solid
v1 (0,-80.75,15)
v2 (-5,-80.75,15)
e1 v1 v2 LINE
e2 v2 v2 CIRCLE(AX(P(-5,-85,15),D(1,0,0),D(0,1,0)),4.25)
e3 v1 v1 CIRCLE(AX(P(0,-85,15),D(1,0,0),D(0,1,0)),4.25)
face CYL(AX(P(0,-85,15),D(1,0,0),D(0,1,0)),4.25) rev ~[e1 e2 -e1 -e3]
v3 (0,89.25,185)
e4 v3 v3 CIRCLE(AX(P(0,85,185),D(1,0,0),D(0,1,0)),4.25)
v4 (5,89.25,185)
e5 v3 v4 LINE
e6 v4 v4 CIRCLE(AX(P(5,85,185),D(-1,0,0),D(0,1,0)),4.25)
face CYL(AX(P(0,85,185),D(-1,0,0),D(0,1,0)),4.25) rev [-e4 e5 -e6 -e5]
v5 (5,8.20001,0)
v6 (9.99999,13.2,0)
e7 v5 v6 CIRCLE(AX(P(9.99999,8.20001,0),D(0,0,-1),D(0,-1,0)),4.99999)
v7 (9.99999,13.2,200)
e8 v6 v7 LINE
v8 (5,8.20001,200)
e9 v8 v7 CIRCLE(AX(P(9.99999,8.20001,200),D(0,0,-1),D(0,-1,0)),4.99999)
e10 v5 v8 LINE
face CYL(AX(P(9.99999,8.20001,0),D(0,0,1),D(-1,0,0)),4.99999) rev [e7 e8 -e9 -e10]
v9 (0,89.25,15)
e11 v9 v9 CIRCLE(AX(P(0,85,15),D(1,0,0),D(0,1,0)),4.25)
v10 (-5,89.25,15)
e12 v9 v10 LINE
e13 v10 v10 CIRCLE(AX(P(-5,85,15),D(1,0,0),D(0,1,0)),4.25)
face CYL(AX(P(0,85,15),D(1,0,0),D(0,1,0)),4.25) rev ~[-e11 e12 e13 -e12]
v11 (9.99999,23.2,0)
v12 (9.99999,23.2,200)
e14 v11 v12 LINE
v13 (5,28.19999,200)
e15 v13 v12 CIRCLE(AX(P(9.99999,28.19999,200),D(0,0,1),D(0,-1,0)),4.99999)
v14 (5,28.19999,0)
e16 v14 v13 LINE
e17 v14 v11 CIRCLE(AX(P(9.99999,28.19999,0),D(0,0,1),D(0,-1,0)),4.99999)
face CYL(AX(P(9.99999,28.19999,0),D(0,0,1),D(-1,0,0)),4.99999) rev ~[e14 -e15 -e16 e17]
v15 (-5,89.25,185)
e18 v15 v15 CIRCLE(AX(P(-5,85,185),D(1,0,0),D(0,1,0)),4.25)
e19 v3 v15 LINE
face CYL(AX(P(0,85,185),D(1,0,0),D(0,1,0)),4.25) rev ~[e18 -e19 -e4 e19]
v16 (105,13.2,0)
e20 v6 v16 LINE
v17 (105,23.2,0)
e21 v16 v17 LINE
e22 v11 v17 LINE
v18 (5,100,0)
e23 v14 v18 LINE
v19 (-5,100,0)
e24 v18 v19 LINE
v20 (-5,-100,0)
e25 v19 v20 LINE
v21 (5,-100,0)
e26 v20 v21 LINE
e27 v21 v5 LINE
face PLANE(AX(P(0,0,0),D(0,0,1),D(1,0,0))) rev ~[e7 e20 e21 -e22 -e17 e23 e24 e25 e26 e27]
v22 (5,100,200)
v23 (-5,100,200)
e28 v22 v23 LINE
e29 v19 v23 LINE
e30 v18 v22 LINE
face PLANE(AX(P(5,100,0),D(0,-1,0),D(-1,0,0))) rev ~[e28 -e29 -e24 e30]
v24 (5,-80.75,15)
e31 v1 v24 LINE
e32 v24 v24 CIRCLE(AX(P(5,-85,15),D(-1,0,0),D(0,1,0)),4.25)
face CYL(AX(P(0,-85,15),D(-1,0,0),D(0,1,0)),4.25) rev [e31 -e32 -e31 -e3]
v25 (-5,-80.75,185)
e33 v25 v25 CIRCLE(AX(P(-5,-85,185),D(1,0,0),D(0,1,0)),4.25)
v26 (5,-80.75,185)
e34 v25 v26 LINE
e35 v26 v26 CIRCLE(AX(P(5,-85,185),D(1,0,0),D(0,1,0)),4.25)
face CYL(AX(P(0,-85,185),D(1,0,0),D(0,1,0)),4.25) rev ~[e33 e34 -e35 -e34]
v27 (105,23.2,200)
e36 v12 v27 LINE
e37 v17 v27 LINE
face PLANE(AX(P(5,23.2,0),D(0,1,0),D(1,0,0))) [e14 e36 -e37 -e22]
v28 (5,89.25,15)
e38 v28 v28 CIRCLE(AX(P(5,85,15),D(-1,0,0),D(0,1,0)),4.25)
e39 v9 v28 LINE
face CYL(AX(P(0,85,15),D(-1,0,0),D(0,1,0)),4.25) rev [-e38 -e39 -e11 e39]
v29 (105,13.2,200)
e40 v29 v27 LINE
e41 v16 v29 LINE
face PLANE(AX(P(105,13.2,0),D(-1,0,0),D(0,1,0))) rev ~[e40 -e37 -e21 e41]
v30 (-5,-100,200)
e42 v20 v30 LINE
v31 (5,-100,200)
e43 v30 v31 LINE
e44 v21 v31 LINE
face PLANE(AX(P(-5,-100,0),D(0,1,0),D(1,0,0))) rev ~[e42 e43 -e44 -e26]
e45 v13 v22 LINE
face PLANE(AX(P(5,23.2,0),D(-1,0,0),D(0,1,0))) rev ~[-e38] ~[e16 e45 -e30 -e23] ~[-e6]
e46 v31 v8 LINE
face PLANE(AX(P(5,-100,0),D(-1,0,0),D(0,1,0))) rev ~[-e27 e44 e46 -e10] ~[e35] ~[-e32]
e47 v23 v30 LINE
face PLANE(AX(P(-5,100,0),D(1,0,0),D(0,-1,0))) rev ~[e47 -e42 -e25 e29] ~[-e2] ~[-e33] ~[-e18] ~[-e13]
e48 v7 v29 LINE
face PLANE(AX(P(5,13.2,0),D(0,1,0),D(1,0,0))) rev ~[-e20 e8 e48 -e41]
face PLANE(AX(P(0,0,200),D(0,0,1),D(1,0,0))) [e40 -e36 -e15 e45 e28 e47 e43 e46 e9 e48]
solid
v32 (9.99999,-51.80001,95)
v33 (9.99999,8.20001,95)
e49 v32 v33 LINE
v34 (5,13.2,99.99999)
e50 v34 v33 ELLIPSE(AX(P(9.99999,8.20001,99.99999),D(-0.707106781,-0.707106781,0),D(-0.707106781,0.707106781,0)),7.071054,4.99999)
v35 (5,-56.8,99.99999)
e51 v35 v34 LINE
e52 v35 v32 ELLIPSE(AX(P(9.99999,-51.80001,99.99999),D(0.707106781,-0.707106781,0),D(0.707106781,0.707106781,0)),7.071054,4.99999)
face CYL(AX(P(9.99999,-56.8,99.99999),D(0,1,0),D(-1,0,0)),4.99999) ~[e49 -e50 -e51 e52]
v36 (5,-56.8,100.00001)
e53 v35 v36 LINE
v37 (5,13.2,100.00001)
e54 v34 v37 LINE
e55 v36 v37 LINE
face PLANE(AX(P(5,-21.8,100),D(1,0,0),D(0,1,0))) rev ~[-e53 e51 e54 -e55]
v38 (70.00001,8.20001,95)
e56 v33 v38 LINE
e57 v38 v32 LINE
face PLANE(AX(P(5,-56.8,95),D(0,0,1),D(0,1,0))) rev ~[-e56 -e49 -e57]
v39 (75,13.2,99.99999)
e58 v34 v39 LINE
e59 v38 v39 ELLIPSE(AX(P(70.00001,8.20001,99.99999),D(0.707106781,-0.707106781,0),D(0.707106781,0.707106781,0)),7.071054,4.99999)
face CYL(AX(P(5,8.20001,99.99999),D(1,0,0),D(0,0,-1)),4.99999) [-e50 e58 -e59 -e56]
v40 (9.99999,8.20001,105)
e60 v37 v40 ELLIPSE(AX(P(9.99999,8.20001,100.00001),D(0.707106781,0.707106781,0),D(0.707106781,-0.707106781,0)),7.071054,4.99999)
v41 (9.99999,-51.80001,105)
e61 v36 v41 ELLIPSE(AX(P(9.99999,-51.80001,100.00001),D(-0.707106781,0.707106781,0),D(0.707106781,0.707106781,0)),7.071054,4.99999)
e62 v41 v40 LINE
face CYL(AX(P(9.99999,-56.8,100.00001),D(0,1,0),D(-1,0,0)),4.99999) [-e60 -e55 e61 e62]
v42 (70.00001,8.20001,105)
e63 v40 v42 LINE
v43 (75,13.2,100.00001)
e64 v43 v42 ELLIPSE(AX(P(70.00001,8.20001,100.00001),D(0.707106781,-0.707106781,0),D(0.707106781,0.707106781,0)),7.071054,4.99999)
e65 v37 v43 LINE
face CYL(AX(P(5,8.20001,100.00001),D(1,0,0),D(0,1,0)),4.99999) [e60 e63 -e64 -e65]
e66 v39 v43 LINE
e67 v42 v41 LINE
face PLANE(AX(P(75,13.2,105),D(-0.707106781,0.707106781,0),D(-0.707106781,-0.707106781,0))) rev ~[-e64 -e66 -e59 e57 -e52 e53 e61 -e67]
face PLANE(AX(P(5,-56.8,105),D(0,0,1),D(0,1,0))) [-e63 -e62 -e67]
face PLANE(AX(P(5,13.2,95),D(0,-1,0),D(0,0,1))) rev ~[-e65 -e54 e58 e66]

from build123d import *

# Parameters (mm, degrees)
F0_W      = 100
F0_H      = 10
F1_DEPTH  = 200
F2_W      = 70
F2_H      = 10
F3_DEPTH  = 70
F5_DEPTH  = 70
F6_R      = 4.25
F7_DEPTH  = 12.5
F9_W      = 70
F9_H      = 10
F10_DEPTH = 70
F12_DEPTH = 25
F13_R     = 4.99999
F13_2_R   = 4.99999


# Not quite as in the source:
# - a fillet or chamfer is up to 0.001 mm smaller than in the source, because OpenCascade refuses the exact size


with BuildPart() as f1:
    # F0 (on Top) → F1 (new body)
    with BuildSketch(Plane.XY):
        Polygon((5, 100), (-5, 100), (-5, -100), (5, -100), (5, 13.2), (5, 23.2), align=None)
        with Locations((55, 18.2)):
            Rectangle(F0_W, F0_H)
    extrude(amount=F1_DEPTH)

    # F6 (on Right) → F7 (cut, symmetric)
    with BuildSketch(Plane.YZ):
        with Locations((85, 185)):
            Circle(F6_R)
        with Locations((85, 15)):
            Circle(F6_R)
        with Locations((-85, 15)):
            Circle(F6_R)
        with Locations((-85, 185)):
            Circle(F6_R)
    extrude(amount=F7_DEPTH, both=True, mode=Mode.SUBTRACT)

    # F13 (radius 5 in the source; OpenCascade refuses exactly that, so slightly less here)
    f13_edges = [f1.edges().sort_by_distance(p)[0] for p in [
        (5, 13.2, 100),
        (5, 23.2, 100),
    ]]
    fillet(f13_edges, radius=F13_R)


with BuildPart() as f3:
    # F2 (on face) → F3 (new body)
    with BuildSketch(Plane.YZ.offset(5)):
        with Locations((-21.8, 100)):
            Rectangle(F2_W, F2_H)
    extrude(amount=F3_DEPTH)

    # F4 (on face) → F5 (cut)
    with BuildSketch(Plane.XY.offset(105)):
        Polygon((75, 13.2), (5, -56.8), (75, -56.8), align=None)
    extrude(amount=-F5_DEPTH, mode=Mode.SUBTRACT)


with BuildPart() as f10:
    # F9 (on face) → F10 (new body)
    with BuildSketch(Plane.YZ.offset(5)):
        with Locations((-21.8, 100)):
            Rectangle(F9_W, F9_H)
    extrude(amount=F10_DEPTH)

    # F11 (on face) → F12 (cut)
    with BuildSketch(Plane.XY.offset(105)):
        Polygon((75, 13.2), (5, -56.8), (75, -56.8), align=None)
    extrude(amount=-F12_DEPTH, mode=Mode.SUBTRACT)

    # F13#2 (radius 5 in the source; OpenCascade refuses exactly that, so slightly less here)
    f13_2_edges = [f10.edges().sort_by_distance(p)[0] for p in [
        (40, 13.2, 105),
        (5, -21.8, 105),
        (5, -21.8, 95),
        (40, 13.2, 95),
    ]]
    fillet(f13_2_edges, radius=F13_2_R)


solid = Compound([f1.part, f10.part])
